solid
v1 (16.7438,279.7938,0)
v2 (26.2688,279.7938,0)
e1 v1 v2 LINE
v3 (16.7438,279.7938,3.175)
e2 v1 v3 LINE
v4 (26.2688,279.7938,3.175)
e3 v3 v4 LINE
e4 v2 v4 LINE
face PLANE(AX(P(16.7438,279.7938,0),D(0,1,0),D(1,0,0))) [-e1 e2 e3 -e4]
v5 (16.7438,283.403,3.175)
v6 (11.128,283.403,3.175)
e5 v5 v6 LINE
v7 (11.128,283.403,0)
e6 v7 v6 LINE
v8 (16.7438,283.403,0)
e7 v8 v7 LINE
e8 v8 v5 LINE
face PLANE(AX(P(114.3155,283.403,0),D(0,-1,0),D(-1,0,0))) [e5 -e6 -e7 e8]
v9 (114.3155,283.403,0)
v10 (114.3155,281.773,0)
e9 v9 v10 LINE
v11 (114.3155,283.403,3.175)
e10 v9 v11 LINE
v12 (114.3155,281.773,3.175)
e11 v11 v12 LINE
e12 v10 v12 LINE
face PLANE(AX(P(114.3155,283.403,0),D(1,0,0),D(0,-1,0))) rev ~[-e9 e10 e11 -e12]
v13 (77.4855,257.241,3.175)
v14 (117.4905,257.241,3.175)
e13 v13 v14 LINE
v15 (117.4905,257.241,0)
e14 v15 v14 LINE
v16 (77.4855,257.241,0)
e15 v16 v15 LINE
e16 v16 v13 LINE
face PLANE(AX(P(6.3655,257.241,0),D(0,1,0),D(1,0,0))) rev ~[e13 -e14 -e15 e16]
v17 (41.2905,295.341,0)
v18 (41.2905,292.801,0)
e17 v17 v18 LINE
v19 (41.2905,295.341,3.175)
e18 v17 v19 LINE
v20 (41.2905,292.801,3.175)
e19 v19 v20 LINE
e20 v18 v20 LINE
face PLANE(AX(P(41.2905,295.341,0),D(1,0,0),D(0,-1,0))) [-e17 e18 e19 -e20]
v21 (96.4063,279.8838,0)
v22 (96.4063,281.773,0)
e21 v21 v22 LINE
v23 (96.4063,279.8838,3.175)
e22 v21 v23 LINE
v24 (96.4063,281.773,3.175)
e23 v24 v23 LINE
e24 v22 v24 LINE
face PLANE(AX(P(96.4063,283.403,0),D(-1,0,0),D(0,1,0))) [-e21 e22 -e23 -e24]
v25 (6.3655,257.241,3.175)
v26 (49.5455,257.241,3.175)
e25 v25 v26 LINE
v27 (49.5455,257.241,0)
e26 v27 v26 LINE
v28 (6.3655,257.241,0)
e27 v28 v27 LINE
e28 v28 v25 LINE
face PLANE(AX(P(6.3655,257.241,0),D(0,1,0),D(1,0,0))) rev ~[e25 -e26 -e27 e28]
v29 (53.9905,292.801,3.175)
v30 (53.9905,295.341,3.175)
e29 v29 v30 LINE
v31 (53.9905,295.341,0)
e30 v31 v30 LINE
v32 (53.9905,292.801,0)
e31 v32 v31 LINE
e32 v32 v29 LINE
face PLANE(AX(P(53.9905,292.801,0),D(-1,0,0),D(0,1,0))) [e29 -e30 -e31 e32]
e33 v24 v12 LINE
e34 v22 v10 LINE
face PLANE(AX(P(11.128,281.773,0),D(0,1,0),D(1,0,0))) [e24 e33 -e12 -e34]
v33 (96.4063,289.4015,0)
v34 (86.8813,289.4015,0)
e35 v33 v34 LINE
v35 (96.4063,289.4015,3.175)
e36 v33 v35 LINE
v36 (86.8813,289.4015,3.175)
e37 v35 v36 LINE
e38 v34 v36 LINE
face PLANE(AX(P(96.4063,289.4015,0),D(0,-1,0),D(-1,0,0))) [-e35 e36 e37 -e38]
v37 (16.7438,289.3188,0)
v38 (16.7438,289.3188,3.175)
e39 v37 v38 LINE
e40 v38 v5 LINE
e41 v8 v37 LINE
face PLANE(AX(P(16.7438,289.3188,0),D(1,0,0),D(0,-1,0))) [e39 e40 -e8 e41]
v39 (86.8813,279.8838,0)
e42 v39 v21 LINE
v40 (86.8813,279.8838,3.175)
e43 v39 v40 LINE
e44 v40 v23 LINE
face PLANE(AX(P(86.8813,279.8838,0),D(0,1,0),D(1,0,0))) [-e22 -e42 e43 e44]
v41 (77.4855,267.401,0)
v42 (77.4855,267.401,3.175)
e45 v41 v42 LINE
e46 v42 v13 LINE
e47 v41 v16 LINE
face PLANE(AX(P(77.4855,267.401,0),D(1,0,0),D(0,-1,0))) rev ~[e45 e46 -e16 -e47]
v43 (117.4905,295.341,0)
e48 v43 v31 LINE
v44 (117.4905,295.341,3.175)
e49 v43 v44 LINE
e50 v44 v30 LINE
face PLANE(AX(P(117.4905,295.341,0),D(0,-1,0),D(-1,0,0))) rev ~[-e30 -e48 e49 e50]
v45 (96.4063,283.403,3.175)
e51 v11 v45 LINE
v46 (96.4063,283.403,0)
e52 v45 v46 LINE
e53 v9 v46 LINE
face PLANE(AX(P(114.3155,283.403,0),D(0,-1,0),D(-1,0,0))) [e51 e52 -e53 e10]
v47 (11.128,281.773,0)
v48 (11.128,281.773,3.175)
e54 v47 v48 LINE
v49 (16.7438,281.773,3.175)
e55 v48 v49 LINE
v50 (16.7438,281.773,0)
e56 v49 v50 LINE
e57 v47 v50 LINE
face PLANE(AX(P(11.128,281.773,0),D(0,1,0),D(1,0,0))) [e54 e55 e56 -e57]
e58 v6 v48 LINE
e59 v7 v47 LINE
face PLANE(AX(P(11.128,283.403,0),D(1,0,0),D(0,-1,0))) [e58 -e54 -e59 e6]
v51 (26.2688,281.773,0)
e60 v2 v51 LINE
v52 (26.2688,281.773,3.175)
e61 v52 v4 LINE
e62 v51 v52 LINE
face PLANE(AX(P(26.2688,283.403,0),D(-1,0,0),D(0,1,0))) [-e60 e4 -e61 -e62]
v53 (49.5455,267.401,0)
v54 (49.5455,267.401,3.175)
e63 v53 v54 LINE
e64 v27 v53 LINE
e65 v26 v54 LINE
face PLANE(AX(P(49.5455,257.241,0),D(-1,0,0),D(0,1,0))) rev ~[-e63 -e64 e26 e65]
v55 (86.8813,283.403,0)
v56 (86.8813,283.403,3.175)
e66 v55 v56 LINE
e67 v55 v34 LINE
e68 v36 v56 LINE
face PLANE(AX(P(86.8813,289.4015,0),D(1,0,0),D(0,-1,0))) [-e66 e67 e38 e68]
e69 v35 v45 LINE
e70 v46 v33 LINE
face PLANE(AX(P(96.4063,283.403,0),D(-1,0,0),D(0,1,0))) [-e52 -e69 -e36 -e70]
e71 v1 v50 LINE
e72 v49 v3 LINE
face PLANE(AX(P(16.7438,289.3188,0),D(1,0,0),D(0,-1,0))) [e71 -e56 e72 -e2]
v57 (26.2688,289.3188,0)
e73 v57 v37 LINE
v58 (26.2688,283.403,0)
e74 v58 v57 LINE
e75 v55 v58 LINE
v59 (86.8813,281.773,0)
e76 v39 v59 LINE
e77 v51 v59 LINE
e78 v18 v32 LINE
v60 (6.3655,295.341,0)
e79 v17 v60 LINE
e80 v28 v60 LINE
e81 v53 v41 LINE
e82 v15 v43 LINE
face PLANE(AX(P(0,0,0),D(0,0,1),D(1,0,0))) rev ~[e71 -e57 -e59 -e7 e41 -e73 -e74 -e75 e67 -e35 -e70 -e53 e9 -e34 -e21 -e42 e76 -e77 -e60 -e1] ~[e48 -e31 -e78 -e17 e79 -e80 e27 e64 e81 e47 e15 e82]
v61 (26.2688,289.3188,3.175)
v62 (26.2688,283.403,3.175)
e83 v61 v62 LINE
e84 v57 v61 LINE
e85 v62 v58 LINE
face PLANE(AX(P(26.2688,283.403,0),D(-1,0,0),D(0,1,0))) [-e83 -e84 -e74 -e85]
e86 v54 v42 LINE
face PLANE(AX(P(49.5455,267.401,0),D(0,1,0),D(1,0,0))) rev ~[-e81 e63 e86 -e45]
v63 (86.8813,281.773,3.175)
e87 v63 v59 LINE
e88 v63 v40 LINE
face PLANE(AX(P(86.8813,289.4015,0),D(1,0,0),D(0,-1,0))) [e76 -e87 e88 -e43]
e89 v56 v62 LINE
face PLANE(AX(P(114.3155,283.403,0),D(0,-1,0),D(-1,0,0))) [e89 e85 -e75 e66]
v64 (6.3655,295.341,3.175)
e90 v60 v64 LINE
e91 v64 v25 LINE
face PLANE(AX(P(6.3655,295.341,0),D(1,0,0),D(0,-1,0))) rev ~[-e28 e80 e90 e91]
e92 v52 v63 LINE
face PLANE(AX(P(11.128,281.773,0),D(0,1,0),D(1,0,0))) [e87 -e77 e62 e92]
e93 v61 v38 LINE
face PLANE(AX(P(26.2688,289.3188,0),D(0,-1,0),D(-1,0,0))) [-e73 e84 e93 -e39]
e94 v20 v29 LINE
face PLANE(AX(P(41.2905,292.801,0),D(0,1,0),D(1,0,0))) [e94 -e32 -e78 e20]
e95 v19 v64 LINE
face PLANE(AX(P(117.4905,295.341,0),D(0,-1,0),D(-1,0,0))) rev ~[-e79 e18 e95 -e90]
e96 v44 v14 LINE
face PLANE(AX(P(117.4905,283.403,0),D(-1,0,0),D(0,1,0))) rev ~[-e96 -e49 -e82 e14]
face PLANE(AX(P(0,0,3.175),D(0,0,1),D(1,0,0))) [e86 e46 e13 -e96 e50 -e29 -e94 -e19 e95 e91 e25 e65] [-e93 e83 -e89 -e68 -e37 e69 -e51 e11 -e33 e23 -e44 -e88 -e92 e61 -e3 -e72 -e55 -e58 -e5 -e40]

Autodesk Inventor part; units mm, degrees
ref_plane "YZ Plane" through (0, 0, 0) normal (1, 0, 0) x (0, 1, 0)
ref_plane "XZ Plane" through (0, 0, 0) normal (0, 1, 0) x (-1, 0, 0)
ref_plane "XY Plane" through (0, 0, 0) normal (0, 0, 1) x (1, 0, 0)
sketch "Sketch1" plane through (0, 0, 0) normal (0, 0, 1) x (1, 0, 0)
  line L0 (117.4905, 295.341) -> (6.3655, 295.341)
  line L1 (6.3655, 295.341) -> (6.3655, 257.241)
  line L2 (6.3655, 257.241) -> (117.4905, 257.241)
  line L3 (117.4905, 257.241) -> (117.4905, 295.341)
  line L4 (117.4905, 283.403) -> (6.3655, 283.403)
  line L5 (6.3655, 283.403) -> (6.3655, 281.773)
  line L6 (6.3655, 281.773) -> (117.4905, 281.773)
  line L7 (117.4905, 281.773) -> (117.4905, 283.403)
  line L8 (117.4905, 281.773) -> (117.4905, 283.403)
  line L9 (6.3655, 283.403) -> (11.128, 283.403)
  line L10 (11.128, 283.403) -> (11.128, 281.773)
  line L11 (11.128, 281.773) -> (6.3655, 281.773)
  line L12 (6.3655, 281.773) -> (6.3655, 283.403)
  line L13 (117.4905, 283.403) -> (114.3155, 283.403)
  line L14 (114.3155, 283.403) -> (114.3155, 281.773)
  line L15 (114.3155, 281.773) -> (117.4905, 281.773)
  line L16 (117.4905, 281.773) -> (117.4905, 283.403)
  point P0 (0, 0)
  dimension "d0" = 38.1
  dimension "d1" = 111.125
  dimension "d2" = 1.63
  dimension "d3" = 11.938
  dimension "d23" = 103.1875
  dimension "d24" = 3.175
extrude "Extrusion1" add sketch "Sketch1" along normal blind 3.175 contours L3 L4 L1 L0 | L3 L6 L14 L4 | L4 L10 L6 L1 | L3 L2 L1 L6
sketch "Sketch2" plane through (0, 0, 0) normal (0, 0, -1) x (-1, 0, 0)
  line L0 (-114.3155, 283.403) -> (-11.128, 283.403) projected
  line L1 (-26.2688, 289.3188) -> (-16.7438, 289.3188)
  line L2 (-16.7438, 289.3188) -> (-16.7438, 279.7938)
  line L3 (-16.7438, 279.7938) -> (-26.2688, 279.7938)
  line L4 (-26.2688, 279.7938) -> (-26.2688, 289.3188)
  line L5 (-96.4063, 289.4015) -> (-86.8813, 289.4015)
  line L6 (-86.8813, 289.4015) -> (-86.8813, 279.8838)
  line L7 (-86.8813, 279.8838) -> (-96.4063, 279.8838)
  line L8 (-96.4063, 279.8838) -> (-96.4063, 289.4015)
  line L9 (-6.3655, 257.241) -> (-117.4905, 257.241) projected
  line L10 (-6.3655, 295.341) -> (-6.3655, 257.241) projected
  line L11 (-77.4855, 257.241) -> (-49.5455, 257.241)
  line L12 (-49.5455, 257.241) -> (-49.5455, 267.401)
  line L13 (-49.5455, 267.401) -> (-77.4855, 267.401)
  line L14 (-77.4855, 267.401) -> (-77.4855, 257.241)
  line L15 (-117.4905, 257.241) -> (-117.4905, 295.341) projected
  line L16 (-117.4905, 295.341) -> (-6.3655, 295.341) projected
  line L17 (-53.9905, 295.341) -> (-41.2905, 295.341)
  line L18 (-41.2905, 295.341) -> (-41.2905, 292.801)
  line L19 (-41.2905, 292.801) -> (-53.9905, 292.801)
  line L20 (-53.9905, 292.801) -> (-53.9905, 295.341)
  point P0 (0, 0)
  point P1 (-117.4905, 283.403)
  point P2 (-6.3655, 283.403)
  dimension "d8" = 9.525
  dimension "d9" = 9.5177
  dimension "d10" = 9.525
  dimension "d11" = 9.525
  dimension "d13" = 5.9159
  dimension "d17" = 10.16
  dimension "d18" = 27.94
  dimension "d19" = 43.18
  dimension "d20" = 2.54
  dimension "d21" = 12.7
  dimension "d22" = 63.5
extrude "Extrusion2" cut sketch "Sketch2" against normal blind 3.175 contours L8 L5 L6 L0 | L0 L6 L7 L8 | L4 L1 L2 L0 | L0 L2 L3 L4 | L9 L14 L13 L12 | L18 L19 L20 L16
properties part number "RearBulkhead"
